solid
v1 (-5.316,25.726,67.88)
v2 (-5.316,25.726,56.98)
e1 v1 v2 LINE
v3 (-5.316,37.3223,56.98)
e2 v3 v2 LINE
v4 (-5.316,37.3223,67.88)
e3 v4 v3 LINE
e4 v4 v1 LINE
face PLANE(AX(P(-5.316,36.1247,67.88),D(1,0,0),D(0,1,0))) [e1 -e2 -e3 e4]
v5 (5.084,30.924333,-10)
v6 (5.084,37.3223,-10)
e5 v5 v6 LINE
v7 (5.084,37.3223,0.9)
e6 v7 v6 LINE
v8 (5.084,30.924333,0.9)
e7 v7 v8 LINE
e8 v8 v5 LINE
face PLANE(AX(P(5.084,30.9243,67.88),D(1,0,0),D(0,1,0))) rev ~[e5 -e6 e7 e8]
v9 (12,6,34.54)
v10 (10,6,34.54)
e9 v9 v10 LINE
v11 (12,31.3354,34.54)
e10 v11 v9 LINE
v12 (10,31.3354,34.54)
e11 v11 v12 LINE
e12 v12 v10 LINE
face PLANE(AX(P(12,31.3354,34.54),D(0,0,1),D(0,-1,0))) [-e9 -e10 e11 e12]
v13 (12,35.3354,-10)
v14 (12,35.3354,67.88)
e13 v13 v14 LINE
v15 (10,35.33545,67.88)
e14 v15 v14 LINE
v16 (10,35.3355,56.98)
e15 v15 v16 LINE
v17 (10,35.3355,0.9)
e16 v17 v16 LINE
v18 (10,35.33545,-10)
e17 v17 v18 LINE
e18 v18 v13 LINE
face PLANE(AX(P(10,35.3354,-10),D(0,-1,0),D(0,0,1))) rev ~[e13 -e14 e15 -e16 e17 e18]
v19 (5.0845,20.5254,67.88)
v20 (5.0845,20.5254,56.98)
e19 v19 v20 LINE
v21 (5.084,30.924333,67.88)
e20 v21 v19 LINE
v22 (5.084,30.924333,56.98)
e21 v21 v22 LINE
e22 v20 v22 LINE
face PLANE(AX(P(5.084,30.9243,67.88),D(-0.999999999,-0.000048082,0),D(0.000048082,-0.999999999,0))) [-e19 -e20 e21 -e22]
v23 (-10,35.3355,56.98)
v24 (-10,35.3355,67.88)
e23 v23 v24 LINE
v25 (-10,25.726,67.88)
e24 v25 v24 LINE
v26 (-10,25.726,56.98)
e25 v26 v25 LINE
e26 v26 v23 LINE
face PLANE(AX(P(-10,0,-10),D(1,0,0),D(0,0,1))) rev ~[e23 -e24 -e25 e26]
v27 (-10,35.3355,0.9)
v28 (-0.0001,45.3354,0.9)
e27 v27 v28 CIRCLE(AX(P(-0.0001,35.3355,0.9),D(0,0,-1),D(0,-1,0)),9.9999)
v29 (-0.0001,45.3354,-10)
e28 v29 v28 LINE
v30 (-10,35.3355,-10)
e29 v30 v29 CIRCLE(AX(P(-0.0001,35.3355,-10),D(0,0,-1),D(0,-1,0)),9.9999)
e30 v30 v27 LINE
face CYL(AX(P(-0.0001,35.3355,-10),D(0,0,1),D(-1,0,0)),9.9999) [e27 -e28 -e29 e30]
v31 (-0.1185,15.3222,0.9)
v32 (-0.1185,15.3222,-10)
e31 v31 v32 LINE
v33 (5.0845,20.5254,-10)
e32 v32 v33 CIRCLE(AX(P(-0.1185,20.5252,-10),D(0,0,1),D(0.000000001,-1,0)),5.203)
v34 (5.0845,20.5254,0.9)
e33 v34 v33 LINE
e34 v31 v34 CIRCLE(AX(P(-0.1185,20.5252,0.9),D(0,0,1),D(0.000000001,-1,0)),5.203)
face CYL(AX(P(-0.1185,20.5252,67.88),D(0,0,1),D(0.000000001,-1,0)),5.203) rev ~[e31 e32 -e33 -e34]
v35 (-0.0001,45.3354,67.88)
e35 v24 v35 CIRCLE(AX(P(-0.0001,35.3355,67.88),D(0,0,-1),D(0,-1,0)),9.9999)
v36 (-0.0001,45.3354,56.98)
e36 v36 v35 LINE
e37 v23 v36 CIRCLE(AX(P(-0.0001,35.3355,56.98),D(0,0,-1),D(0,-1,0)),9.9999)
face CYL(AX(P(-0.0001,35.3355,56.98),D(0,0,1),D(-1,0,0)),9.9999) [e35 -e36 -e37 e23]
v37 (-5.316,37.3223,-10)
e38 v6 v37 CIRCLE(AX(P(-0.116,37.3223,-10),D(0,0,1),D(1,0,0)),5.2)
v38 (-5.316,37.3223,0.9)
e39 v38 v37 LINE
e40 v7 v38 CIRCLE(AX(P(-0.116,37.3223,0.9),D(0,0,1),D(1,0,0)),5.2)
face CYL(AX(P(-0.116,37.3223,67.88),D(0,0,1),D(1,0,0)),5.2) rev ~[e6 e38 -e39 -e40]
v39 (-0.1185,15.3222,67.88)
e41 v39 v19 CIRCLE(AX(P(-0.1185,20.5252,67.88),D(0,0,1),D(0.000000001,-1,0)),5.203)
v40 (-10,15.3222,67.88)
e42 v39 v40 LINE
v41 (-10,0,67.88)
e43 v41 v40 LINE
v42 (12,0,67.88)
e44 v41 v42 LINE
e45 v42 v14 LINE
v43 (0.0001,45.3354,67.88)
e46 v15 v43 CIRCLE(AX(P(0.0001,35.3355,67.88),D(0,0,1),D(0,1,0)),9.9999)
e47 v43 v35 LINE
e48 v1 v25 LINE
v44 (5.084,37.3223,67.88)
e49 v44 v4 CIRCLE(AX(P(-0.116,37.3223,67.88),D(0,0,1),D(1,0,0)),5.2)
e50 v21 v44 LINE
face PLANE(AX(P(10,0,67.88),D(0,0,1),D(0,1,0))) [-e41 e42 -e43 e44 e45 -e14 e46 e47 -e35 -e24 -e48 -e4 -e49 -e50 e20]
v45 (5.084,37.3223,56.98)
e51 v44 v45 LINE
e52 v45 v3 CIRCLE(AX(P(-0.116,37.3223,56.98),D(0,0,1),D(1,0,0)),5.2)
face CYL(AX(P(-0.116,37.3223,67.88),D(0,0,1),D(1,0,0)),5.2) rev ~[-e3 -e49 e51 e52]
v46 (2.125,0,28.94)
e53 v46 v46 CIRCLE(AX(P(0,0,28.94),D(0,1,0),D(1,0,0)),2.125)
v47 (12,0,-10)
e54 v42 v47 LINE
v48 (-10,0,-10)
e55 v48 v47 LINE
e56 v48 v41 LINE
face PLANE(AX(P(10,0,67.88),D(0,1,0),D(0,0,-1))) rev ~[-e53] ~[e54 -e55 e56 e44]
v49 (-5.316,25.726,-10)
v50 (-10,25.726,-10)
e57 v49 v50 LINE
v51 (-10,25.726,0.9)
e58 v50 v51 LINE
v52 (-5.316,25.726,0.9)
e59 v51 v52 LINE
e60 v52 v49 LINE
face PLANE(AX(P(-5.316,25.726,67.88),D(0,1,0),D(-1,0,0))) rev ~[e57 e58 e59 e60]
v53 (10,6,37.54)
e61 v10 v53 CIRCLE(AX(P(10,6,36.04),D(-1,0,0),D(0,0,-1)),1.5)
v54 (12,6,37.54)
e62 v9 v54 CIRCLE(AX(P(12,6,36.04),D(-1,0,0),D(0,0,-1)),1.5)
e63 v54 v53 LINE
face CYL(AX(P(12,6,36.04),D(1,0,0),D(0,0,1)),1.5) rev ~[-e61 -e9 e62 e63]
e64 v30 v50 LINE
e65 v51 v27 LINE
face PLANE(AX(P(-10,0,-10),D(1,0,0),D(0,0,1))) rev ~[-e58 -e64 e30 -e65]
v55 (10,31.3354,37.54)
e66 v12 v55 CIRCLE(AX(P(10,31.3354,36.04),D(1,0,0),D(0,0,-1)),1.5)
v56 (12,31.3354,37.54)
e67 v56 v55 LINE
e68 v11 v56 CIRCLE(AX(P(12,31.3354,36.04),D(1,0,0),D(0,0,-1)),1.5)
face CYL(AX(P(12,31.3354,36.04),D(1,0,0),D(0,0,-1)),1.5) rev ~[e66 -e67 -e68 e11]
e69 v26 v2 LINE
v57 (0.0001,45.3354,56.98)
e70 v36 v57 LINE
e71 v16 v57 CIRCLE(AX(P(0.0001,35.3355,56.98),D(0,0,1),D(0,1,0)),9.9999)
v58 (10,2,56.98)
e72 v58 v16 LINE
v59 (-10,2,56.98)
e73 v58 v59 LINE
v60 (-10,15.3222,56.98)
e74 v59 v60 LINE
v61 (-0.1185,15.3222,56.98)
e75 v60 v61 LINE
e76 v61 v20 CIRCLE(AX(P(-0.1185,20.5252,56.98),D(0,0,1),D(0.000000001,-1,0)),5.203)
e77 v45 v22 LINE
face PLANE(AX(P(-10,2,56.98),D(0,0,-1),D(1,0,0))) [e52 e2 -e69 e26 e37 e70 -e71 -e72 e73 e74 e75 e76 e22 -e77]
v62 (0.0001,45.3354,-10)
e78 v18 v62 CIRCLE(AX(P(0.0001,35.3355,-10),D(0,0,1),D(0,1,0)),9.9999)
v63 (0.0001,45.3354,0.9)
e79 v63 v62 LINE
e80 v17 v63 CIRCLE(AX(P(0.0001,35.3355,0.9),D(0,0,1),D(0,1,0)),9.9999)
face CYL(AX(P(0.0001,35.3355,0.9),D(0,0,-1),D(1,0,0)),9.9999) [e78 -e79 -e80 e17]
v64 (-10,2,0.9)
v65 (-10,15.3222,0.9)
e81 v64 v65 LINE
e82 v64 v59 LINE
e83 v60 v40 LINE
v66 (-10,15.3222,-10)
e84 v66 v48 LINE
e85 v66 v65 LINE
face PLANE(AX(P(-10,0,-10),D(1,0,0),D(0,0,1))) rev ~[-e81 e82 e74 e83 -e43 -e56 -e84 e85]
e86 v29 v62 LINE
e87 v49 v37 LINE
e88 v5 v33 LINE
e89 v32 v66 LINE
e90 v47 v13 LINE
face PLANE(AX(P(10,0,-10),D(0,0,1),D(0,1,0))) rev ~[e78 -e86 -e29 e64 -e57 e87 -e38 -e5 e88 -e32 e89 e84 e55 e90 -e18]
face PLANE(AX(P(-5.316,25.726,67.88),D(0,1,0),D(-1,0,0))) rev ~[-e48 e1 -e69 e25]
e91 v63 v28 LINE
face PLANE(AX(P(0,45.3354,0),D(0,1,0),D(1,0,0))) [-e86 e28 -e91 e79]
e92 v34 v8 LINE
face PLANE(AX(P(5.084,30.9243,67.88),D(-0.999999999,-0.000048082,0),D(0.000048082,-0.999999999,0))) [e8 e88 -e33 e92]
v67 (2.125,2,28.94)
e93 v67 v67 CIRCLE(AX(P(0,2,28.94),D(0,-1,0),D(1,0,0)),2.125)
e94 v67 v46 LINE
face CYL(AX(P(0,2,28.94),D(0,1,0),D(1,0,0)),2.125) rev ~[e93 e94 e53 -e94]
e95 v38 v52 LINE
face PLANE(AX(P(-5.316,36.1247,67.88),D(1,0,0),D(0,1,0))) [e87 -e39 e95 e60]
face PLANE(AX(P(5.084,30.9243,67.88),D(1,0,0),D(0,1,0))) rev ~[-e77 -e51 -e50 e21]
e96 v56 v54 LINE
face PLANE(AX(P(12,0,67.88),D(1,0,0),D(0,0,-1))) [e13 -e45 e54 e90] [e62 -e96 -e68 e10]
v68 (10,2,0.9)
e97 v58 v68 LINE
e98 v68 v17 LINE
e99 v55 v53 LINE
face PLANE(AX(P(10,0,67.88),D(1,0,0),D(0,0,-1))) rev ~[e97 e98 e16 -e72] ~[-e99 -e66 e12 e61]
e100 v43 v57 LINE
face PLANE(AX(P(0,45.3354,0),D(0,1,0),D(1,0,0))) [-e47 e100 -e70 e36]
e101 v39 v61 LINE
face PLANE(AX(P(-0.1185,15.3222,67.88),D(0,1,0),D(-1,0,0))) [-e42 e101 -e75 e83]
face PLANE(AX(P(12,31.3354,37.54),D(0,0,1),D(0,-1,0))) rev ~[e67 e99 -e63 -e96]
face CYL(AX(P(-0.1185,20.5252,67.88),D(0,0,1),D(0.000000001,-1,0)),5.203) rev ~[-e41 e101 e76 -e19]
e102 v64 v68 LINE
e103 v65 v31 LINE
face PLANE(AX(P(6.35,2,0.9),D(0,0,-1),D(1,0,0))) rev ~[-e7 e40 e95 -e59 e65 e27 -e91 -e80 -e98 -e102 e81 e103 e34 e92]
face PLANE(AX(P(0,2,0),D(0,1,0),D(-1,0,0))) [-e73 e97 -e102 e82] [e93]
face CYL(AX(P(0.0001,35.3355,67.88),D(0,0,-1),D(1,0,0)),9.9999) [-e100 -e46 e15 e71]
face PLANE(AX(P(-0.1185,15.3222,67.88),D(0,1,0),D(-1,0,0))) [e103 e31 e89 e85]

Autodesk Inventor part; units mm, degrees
ref_plane "YZ Plane" through (0, 0, 0) normal (1, 0, 0) x (0, 1, 0)
ref_plane "XZ Plane" through (0, 0, 0) normal (0, 1, 0) x (-1, 0, 0)
ref_plane "XY Plane" through (0, 0, 0) normal (0, 0, 1) x (1, 0, 0)
sketch "Sketch1" plane through (0, 0, 0) normal (0, 1, 0) x (-1, 0, 0)
  line L0 (10, 67.88) -> (-10, 67.88)
  line L1 (-10, 67.88) -> (-10, -10)
  line L2 (-10, -10) -> (10, -10)
  line L3 (10, -10) -> (10, 67.88)
  point P0 (0, 0)
  dimension "d0" = 20
  dimension "d1" = 77.88
extrude "Extrusion1" add sketch "Sketch1" along normal blind 2
sketch "Sketch2" plane through (0, 2, 0) normal (0, 1, 0) x (1, 0, 0)
  line L0 (-10, -67.88) -> (10, -67.88) projected
  line L1 (0, -67.88) -> (-6.35, -67.88)
  line L2 (-6.35, -56.98) -> (6.35, -56.98)
  line L3 (6.35, -67.88) -> (0, -67.88)
  line L4 (10, 10) -> (-10, 10) projected
  line L5 (-6.35, -0.9) -> (6.35, -0.9)
  line L6 (-6.35, 10) -> (6.35, 10)
  line L7 (-6.35, -67.88) -> (-10, -67.88)
  line L8 (-10, 10) -> (-10, -67.88) projected
  line L9 (-10, -56.98) -> (-6.35, -56.98)
  line L10 (6.35, -67.88) -> (10, -67.88)
  line L11 (10, -67.88) -> (10, 10) projected
  line L12 (10, -56.98) -> (6.35, -56.98)
  line L13 (6.35, -0.9) -> (10, -0.9)
  line L14 (10, 10) -> (6.35, 10)
  line L15 (10, -0.9) -> (10, 10)
  line L16 (10, -67.88) -> (10, -56.98)
  line L17 (-10, -67.88) -> (-10, -56.98)
  line L18 (-6.35, -0.9) -> (-10, -0.9)
  line L19 (-10, -0.9) -> (-10, 10)
  line L20 (-10, 10) -> (-6.35, 10)
  point P0 (0, 0)
  dimension "d4" = 6.35
  dimension "d5" = 10.9
  dimension "d6" = 12.7
  dimension "d7" = 10.9
extrude "Extrusion2" add sketch "Sketch2" along normal blind 43.3354 contours L8 L9 L2 L12 L11 L0 | L8 L4 L11 L13 L5 L18
sketch "Sketch9" plane through (-10, 0, 67.88) normal (0, 0, 1) x (1, 0, 0)
  arc A0 (15.084, 37.3223) -> (4.684, 37.3223) centre (9.884, 37.3223) ccw
  line L0 (15.084, 30.9243) -> (15.084, 37.3223)
  line L1 (4.684, 36.1247) -> (4.684, 37.3223)
  arc A1 (15.084, 37.3223) -> (4.684, 37.3223) centre (9.884, 37.3223) ccw
  line L2 (4.684, 37.3223) -> (4.684, 30.9247)
  line L3 (9.8815, 15.3222) -> (-0.0013, 15.3222)
  line L4 (-0.0013, 25.726) -> (-0.0013, 15.3222)
  line L5 (4.684, 30.9247) -> (4.684, 25.726)
  line L6 (15.084, 30.9243) -> (15.0845, 20.5254)
  arc A2 (15.084, 30.9243) -> (15.084, 30.9251) centre (9.884, 30.9244) ccw
  line L7 (4.684, 25.726) -> (-0.0013, 25.726)
  arc A3 (9.8815, 15.3222) -> (15.0845, 20.5254) centre (9.8815, 20.5252) ccw
  line L8 (0, 0) -> (20, 0) projected
  line L9 (0, 45.3354) -> (20, 45.3354) projected
  point P0 (10, 0)
  point P1 (2.3413, 25.726)
  point P2 (15.084, 30.9247)
  point P3 (9.884, 42.5223)
  point P4 (-0.0013, 20.5241)
  point P5 (10, 45.3354)
  dimension "d76" = 15.3222
  dimension "d77" = 10.4039
  dimension "d78" = 10.4
  dimension "d79" = 27.2001
  dimension "d80" = 15.0858
  dimension "d81" = 8.0131
fillet "Fillet4" radius 10 4 edges at (10, 45.3354, 62.43) (-10, 45.3354, 62.43) (-10, 45.3354, -4.55) (10, 45.3354, -4.55)
sketch "Sketch10" plane through (0, 2, 0) normal (0, 1, 0) x (1, 0, 0)
  line L0 (10, -67.88) -> (-10, -67.88) projected
  line L1 (-10, 10) -> (10, 10) projected
  line L2 (10, -56.98) -> (10, -0.9) projected
  line L3 (-10, -0.9) -> (-10, -56.98) projected
  line L4 (10, -28.94) -> (-10, -28.94)
  circle A0 centre (0, -28.94) radius 2.125
  point P0 (0, 0)
  dimension "d53" = 77.88
  dimension "d54" = 4.25
extrude "Extrusion10" cut sketch "Sketch10" against normal blind 2
extrude "Extrusion11" cut sketch "Sketch9" against normal through all
sketch "Sketch11" plane through (10, 0, 67.88) normal (1, 0, 0) x (0, 0, -1)
  line L0 (0, 0) -> (0, 15.3222) projected
  line L1 (77.88, 25.726) -> (77.88, 35.3354) projected
  line L2 (0, 0) -> (77.88, 0)
  line L3 (77.88, 0) -> (77.88, 35.3354)
  line L4 (77.88, 35.3354) -> (0, 35.3354)
  line L5 (0, 35.3354) -> (0, 0)
  point P0 (67.88, 0)
extrude "Extrusion12" add sketch "Sketch11" along normal blind 2
sketch "Sketch12" plane through (12, 0, 67.88) normal (1, 0, 0) x (0, 0, -1)
  line L0 (10.9, 35.3354) -> (0, 35.3354) projected
  line L1 (77.88, 25.726) -> (77.88, 35.3354) projected
  line L2 (0, 35.3354) -> (77.88, 35.3354)
  line L3 (77.88, 35.3354) -> (0, 35.3354) projected
  line L4 (38.94, 35.3354) -> (64.34, 35.3354)
  line L5 (38.94, 35.3354) -> (13.54, 35.3354)
  line L6 (77.88, 0) -> (0, 0) projected
  line L7 (13.54, 35.3354) -> (64.34, 35.3354)
  line L8 (64.34, 35.3354) -> (64.34, 0)
  line L9 (64.34, 0) -> (13.54, 0)
  line L10 (13.54, 0) -> (13.54, 35.3354)
  line L11 (13.54, 0) -> (31.84, 0)
  line L12 (31.84, 0) -> (31.84, 6)
  arc A0 (33.34, 31.3354) -> (30.34, 31.3354) centre (31.84, 31.3354) ccw
  arc A1 (30.34, 6) -> (33.34, 6) centre (31.84, 6) ccw
  line L13 (30.34, 31.3354) -> (30.34, 6)
  line L14 (33.34, 31.3354) -> (33.34, 6)
  line L15 (31.84, 31.3354) -> (13.54, 31.3354)
  point P0 (67.88, 0)
  dimension "d65" = 25.4
  dimension "d66" = 25.4
  dimension "d67" = 50.8
  dimension "d68" = 18.3
  dimension "d69" = 6
  dimension "d71" = 3
  dimension "d72" = 3
  dimension "d75" = 18.3
extrude "Extrusion13" cut sketch "Sketch12" against normal blind 2 contours A0 L14 A1 L13
properties part number "6 Backet Adjustment 3.0"
